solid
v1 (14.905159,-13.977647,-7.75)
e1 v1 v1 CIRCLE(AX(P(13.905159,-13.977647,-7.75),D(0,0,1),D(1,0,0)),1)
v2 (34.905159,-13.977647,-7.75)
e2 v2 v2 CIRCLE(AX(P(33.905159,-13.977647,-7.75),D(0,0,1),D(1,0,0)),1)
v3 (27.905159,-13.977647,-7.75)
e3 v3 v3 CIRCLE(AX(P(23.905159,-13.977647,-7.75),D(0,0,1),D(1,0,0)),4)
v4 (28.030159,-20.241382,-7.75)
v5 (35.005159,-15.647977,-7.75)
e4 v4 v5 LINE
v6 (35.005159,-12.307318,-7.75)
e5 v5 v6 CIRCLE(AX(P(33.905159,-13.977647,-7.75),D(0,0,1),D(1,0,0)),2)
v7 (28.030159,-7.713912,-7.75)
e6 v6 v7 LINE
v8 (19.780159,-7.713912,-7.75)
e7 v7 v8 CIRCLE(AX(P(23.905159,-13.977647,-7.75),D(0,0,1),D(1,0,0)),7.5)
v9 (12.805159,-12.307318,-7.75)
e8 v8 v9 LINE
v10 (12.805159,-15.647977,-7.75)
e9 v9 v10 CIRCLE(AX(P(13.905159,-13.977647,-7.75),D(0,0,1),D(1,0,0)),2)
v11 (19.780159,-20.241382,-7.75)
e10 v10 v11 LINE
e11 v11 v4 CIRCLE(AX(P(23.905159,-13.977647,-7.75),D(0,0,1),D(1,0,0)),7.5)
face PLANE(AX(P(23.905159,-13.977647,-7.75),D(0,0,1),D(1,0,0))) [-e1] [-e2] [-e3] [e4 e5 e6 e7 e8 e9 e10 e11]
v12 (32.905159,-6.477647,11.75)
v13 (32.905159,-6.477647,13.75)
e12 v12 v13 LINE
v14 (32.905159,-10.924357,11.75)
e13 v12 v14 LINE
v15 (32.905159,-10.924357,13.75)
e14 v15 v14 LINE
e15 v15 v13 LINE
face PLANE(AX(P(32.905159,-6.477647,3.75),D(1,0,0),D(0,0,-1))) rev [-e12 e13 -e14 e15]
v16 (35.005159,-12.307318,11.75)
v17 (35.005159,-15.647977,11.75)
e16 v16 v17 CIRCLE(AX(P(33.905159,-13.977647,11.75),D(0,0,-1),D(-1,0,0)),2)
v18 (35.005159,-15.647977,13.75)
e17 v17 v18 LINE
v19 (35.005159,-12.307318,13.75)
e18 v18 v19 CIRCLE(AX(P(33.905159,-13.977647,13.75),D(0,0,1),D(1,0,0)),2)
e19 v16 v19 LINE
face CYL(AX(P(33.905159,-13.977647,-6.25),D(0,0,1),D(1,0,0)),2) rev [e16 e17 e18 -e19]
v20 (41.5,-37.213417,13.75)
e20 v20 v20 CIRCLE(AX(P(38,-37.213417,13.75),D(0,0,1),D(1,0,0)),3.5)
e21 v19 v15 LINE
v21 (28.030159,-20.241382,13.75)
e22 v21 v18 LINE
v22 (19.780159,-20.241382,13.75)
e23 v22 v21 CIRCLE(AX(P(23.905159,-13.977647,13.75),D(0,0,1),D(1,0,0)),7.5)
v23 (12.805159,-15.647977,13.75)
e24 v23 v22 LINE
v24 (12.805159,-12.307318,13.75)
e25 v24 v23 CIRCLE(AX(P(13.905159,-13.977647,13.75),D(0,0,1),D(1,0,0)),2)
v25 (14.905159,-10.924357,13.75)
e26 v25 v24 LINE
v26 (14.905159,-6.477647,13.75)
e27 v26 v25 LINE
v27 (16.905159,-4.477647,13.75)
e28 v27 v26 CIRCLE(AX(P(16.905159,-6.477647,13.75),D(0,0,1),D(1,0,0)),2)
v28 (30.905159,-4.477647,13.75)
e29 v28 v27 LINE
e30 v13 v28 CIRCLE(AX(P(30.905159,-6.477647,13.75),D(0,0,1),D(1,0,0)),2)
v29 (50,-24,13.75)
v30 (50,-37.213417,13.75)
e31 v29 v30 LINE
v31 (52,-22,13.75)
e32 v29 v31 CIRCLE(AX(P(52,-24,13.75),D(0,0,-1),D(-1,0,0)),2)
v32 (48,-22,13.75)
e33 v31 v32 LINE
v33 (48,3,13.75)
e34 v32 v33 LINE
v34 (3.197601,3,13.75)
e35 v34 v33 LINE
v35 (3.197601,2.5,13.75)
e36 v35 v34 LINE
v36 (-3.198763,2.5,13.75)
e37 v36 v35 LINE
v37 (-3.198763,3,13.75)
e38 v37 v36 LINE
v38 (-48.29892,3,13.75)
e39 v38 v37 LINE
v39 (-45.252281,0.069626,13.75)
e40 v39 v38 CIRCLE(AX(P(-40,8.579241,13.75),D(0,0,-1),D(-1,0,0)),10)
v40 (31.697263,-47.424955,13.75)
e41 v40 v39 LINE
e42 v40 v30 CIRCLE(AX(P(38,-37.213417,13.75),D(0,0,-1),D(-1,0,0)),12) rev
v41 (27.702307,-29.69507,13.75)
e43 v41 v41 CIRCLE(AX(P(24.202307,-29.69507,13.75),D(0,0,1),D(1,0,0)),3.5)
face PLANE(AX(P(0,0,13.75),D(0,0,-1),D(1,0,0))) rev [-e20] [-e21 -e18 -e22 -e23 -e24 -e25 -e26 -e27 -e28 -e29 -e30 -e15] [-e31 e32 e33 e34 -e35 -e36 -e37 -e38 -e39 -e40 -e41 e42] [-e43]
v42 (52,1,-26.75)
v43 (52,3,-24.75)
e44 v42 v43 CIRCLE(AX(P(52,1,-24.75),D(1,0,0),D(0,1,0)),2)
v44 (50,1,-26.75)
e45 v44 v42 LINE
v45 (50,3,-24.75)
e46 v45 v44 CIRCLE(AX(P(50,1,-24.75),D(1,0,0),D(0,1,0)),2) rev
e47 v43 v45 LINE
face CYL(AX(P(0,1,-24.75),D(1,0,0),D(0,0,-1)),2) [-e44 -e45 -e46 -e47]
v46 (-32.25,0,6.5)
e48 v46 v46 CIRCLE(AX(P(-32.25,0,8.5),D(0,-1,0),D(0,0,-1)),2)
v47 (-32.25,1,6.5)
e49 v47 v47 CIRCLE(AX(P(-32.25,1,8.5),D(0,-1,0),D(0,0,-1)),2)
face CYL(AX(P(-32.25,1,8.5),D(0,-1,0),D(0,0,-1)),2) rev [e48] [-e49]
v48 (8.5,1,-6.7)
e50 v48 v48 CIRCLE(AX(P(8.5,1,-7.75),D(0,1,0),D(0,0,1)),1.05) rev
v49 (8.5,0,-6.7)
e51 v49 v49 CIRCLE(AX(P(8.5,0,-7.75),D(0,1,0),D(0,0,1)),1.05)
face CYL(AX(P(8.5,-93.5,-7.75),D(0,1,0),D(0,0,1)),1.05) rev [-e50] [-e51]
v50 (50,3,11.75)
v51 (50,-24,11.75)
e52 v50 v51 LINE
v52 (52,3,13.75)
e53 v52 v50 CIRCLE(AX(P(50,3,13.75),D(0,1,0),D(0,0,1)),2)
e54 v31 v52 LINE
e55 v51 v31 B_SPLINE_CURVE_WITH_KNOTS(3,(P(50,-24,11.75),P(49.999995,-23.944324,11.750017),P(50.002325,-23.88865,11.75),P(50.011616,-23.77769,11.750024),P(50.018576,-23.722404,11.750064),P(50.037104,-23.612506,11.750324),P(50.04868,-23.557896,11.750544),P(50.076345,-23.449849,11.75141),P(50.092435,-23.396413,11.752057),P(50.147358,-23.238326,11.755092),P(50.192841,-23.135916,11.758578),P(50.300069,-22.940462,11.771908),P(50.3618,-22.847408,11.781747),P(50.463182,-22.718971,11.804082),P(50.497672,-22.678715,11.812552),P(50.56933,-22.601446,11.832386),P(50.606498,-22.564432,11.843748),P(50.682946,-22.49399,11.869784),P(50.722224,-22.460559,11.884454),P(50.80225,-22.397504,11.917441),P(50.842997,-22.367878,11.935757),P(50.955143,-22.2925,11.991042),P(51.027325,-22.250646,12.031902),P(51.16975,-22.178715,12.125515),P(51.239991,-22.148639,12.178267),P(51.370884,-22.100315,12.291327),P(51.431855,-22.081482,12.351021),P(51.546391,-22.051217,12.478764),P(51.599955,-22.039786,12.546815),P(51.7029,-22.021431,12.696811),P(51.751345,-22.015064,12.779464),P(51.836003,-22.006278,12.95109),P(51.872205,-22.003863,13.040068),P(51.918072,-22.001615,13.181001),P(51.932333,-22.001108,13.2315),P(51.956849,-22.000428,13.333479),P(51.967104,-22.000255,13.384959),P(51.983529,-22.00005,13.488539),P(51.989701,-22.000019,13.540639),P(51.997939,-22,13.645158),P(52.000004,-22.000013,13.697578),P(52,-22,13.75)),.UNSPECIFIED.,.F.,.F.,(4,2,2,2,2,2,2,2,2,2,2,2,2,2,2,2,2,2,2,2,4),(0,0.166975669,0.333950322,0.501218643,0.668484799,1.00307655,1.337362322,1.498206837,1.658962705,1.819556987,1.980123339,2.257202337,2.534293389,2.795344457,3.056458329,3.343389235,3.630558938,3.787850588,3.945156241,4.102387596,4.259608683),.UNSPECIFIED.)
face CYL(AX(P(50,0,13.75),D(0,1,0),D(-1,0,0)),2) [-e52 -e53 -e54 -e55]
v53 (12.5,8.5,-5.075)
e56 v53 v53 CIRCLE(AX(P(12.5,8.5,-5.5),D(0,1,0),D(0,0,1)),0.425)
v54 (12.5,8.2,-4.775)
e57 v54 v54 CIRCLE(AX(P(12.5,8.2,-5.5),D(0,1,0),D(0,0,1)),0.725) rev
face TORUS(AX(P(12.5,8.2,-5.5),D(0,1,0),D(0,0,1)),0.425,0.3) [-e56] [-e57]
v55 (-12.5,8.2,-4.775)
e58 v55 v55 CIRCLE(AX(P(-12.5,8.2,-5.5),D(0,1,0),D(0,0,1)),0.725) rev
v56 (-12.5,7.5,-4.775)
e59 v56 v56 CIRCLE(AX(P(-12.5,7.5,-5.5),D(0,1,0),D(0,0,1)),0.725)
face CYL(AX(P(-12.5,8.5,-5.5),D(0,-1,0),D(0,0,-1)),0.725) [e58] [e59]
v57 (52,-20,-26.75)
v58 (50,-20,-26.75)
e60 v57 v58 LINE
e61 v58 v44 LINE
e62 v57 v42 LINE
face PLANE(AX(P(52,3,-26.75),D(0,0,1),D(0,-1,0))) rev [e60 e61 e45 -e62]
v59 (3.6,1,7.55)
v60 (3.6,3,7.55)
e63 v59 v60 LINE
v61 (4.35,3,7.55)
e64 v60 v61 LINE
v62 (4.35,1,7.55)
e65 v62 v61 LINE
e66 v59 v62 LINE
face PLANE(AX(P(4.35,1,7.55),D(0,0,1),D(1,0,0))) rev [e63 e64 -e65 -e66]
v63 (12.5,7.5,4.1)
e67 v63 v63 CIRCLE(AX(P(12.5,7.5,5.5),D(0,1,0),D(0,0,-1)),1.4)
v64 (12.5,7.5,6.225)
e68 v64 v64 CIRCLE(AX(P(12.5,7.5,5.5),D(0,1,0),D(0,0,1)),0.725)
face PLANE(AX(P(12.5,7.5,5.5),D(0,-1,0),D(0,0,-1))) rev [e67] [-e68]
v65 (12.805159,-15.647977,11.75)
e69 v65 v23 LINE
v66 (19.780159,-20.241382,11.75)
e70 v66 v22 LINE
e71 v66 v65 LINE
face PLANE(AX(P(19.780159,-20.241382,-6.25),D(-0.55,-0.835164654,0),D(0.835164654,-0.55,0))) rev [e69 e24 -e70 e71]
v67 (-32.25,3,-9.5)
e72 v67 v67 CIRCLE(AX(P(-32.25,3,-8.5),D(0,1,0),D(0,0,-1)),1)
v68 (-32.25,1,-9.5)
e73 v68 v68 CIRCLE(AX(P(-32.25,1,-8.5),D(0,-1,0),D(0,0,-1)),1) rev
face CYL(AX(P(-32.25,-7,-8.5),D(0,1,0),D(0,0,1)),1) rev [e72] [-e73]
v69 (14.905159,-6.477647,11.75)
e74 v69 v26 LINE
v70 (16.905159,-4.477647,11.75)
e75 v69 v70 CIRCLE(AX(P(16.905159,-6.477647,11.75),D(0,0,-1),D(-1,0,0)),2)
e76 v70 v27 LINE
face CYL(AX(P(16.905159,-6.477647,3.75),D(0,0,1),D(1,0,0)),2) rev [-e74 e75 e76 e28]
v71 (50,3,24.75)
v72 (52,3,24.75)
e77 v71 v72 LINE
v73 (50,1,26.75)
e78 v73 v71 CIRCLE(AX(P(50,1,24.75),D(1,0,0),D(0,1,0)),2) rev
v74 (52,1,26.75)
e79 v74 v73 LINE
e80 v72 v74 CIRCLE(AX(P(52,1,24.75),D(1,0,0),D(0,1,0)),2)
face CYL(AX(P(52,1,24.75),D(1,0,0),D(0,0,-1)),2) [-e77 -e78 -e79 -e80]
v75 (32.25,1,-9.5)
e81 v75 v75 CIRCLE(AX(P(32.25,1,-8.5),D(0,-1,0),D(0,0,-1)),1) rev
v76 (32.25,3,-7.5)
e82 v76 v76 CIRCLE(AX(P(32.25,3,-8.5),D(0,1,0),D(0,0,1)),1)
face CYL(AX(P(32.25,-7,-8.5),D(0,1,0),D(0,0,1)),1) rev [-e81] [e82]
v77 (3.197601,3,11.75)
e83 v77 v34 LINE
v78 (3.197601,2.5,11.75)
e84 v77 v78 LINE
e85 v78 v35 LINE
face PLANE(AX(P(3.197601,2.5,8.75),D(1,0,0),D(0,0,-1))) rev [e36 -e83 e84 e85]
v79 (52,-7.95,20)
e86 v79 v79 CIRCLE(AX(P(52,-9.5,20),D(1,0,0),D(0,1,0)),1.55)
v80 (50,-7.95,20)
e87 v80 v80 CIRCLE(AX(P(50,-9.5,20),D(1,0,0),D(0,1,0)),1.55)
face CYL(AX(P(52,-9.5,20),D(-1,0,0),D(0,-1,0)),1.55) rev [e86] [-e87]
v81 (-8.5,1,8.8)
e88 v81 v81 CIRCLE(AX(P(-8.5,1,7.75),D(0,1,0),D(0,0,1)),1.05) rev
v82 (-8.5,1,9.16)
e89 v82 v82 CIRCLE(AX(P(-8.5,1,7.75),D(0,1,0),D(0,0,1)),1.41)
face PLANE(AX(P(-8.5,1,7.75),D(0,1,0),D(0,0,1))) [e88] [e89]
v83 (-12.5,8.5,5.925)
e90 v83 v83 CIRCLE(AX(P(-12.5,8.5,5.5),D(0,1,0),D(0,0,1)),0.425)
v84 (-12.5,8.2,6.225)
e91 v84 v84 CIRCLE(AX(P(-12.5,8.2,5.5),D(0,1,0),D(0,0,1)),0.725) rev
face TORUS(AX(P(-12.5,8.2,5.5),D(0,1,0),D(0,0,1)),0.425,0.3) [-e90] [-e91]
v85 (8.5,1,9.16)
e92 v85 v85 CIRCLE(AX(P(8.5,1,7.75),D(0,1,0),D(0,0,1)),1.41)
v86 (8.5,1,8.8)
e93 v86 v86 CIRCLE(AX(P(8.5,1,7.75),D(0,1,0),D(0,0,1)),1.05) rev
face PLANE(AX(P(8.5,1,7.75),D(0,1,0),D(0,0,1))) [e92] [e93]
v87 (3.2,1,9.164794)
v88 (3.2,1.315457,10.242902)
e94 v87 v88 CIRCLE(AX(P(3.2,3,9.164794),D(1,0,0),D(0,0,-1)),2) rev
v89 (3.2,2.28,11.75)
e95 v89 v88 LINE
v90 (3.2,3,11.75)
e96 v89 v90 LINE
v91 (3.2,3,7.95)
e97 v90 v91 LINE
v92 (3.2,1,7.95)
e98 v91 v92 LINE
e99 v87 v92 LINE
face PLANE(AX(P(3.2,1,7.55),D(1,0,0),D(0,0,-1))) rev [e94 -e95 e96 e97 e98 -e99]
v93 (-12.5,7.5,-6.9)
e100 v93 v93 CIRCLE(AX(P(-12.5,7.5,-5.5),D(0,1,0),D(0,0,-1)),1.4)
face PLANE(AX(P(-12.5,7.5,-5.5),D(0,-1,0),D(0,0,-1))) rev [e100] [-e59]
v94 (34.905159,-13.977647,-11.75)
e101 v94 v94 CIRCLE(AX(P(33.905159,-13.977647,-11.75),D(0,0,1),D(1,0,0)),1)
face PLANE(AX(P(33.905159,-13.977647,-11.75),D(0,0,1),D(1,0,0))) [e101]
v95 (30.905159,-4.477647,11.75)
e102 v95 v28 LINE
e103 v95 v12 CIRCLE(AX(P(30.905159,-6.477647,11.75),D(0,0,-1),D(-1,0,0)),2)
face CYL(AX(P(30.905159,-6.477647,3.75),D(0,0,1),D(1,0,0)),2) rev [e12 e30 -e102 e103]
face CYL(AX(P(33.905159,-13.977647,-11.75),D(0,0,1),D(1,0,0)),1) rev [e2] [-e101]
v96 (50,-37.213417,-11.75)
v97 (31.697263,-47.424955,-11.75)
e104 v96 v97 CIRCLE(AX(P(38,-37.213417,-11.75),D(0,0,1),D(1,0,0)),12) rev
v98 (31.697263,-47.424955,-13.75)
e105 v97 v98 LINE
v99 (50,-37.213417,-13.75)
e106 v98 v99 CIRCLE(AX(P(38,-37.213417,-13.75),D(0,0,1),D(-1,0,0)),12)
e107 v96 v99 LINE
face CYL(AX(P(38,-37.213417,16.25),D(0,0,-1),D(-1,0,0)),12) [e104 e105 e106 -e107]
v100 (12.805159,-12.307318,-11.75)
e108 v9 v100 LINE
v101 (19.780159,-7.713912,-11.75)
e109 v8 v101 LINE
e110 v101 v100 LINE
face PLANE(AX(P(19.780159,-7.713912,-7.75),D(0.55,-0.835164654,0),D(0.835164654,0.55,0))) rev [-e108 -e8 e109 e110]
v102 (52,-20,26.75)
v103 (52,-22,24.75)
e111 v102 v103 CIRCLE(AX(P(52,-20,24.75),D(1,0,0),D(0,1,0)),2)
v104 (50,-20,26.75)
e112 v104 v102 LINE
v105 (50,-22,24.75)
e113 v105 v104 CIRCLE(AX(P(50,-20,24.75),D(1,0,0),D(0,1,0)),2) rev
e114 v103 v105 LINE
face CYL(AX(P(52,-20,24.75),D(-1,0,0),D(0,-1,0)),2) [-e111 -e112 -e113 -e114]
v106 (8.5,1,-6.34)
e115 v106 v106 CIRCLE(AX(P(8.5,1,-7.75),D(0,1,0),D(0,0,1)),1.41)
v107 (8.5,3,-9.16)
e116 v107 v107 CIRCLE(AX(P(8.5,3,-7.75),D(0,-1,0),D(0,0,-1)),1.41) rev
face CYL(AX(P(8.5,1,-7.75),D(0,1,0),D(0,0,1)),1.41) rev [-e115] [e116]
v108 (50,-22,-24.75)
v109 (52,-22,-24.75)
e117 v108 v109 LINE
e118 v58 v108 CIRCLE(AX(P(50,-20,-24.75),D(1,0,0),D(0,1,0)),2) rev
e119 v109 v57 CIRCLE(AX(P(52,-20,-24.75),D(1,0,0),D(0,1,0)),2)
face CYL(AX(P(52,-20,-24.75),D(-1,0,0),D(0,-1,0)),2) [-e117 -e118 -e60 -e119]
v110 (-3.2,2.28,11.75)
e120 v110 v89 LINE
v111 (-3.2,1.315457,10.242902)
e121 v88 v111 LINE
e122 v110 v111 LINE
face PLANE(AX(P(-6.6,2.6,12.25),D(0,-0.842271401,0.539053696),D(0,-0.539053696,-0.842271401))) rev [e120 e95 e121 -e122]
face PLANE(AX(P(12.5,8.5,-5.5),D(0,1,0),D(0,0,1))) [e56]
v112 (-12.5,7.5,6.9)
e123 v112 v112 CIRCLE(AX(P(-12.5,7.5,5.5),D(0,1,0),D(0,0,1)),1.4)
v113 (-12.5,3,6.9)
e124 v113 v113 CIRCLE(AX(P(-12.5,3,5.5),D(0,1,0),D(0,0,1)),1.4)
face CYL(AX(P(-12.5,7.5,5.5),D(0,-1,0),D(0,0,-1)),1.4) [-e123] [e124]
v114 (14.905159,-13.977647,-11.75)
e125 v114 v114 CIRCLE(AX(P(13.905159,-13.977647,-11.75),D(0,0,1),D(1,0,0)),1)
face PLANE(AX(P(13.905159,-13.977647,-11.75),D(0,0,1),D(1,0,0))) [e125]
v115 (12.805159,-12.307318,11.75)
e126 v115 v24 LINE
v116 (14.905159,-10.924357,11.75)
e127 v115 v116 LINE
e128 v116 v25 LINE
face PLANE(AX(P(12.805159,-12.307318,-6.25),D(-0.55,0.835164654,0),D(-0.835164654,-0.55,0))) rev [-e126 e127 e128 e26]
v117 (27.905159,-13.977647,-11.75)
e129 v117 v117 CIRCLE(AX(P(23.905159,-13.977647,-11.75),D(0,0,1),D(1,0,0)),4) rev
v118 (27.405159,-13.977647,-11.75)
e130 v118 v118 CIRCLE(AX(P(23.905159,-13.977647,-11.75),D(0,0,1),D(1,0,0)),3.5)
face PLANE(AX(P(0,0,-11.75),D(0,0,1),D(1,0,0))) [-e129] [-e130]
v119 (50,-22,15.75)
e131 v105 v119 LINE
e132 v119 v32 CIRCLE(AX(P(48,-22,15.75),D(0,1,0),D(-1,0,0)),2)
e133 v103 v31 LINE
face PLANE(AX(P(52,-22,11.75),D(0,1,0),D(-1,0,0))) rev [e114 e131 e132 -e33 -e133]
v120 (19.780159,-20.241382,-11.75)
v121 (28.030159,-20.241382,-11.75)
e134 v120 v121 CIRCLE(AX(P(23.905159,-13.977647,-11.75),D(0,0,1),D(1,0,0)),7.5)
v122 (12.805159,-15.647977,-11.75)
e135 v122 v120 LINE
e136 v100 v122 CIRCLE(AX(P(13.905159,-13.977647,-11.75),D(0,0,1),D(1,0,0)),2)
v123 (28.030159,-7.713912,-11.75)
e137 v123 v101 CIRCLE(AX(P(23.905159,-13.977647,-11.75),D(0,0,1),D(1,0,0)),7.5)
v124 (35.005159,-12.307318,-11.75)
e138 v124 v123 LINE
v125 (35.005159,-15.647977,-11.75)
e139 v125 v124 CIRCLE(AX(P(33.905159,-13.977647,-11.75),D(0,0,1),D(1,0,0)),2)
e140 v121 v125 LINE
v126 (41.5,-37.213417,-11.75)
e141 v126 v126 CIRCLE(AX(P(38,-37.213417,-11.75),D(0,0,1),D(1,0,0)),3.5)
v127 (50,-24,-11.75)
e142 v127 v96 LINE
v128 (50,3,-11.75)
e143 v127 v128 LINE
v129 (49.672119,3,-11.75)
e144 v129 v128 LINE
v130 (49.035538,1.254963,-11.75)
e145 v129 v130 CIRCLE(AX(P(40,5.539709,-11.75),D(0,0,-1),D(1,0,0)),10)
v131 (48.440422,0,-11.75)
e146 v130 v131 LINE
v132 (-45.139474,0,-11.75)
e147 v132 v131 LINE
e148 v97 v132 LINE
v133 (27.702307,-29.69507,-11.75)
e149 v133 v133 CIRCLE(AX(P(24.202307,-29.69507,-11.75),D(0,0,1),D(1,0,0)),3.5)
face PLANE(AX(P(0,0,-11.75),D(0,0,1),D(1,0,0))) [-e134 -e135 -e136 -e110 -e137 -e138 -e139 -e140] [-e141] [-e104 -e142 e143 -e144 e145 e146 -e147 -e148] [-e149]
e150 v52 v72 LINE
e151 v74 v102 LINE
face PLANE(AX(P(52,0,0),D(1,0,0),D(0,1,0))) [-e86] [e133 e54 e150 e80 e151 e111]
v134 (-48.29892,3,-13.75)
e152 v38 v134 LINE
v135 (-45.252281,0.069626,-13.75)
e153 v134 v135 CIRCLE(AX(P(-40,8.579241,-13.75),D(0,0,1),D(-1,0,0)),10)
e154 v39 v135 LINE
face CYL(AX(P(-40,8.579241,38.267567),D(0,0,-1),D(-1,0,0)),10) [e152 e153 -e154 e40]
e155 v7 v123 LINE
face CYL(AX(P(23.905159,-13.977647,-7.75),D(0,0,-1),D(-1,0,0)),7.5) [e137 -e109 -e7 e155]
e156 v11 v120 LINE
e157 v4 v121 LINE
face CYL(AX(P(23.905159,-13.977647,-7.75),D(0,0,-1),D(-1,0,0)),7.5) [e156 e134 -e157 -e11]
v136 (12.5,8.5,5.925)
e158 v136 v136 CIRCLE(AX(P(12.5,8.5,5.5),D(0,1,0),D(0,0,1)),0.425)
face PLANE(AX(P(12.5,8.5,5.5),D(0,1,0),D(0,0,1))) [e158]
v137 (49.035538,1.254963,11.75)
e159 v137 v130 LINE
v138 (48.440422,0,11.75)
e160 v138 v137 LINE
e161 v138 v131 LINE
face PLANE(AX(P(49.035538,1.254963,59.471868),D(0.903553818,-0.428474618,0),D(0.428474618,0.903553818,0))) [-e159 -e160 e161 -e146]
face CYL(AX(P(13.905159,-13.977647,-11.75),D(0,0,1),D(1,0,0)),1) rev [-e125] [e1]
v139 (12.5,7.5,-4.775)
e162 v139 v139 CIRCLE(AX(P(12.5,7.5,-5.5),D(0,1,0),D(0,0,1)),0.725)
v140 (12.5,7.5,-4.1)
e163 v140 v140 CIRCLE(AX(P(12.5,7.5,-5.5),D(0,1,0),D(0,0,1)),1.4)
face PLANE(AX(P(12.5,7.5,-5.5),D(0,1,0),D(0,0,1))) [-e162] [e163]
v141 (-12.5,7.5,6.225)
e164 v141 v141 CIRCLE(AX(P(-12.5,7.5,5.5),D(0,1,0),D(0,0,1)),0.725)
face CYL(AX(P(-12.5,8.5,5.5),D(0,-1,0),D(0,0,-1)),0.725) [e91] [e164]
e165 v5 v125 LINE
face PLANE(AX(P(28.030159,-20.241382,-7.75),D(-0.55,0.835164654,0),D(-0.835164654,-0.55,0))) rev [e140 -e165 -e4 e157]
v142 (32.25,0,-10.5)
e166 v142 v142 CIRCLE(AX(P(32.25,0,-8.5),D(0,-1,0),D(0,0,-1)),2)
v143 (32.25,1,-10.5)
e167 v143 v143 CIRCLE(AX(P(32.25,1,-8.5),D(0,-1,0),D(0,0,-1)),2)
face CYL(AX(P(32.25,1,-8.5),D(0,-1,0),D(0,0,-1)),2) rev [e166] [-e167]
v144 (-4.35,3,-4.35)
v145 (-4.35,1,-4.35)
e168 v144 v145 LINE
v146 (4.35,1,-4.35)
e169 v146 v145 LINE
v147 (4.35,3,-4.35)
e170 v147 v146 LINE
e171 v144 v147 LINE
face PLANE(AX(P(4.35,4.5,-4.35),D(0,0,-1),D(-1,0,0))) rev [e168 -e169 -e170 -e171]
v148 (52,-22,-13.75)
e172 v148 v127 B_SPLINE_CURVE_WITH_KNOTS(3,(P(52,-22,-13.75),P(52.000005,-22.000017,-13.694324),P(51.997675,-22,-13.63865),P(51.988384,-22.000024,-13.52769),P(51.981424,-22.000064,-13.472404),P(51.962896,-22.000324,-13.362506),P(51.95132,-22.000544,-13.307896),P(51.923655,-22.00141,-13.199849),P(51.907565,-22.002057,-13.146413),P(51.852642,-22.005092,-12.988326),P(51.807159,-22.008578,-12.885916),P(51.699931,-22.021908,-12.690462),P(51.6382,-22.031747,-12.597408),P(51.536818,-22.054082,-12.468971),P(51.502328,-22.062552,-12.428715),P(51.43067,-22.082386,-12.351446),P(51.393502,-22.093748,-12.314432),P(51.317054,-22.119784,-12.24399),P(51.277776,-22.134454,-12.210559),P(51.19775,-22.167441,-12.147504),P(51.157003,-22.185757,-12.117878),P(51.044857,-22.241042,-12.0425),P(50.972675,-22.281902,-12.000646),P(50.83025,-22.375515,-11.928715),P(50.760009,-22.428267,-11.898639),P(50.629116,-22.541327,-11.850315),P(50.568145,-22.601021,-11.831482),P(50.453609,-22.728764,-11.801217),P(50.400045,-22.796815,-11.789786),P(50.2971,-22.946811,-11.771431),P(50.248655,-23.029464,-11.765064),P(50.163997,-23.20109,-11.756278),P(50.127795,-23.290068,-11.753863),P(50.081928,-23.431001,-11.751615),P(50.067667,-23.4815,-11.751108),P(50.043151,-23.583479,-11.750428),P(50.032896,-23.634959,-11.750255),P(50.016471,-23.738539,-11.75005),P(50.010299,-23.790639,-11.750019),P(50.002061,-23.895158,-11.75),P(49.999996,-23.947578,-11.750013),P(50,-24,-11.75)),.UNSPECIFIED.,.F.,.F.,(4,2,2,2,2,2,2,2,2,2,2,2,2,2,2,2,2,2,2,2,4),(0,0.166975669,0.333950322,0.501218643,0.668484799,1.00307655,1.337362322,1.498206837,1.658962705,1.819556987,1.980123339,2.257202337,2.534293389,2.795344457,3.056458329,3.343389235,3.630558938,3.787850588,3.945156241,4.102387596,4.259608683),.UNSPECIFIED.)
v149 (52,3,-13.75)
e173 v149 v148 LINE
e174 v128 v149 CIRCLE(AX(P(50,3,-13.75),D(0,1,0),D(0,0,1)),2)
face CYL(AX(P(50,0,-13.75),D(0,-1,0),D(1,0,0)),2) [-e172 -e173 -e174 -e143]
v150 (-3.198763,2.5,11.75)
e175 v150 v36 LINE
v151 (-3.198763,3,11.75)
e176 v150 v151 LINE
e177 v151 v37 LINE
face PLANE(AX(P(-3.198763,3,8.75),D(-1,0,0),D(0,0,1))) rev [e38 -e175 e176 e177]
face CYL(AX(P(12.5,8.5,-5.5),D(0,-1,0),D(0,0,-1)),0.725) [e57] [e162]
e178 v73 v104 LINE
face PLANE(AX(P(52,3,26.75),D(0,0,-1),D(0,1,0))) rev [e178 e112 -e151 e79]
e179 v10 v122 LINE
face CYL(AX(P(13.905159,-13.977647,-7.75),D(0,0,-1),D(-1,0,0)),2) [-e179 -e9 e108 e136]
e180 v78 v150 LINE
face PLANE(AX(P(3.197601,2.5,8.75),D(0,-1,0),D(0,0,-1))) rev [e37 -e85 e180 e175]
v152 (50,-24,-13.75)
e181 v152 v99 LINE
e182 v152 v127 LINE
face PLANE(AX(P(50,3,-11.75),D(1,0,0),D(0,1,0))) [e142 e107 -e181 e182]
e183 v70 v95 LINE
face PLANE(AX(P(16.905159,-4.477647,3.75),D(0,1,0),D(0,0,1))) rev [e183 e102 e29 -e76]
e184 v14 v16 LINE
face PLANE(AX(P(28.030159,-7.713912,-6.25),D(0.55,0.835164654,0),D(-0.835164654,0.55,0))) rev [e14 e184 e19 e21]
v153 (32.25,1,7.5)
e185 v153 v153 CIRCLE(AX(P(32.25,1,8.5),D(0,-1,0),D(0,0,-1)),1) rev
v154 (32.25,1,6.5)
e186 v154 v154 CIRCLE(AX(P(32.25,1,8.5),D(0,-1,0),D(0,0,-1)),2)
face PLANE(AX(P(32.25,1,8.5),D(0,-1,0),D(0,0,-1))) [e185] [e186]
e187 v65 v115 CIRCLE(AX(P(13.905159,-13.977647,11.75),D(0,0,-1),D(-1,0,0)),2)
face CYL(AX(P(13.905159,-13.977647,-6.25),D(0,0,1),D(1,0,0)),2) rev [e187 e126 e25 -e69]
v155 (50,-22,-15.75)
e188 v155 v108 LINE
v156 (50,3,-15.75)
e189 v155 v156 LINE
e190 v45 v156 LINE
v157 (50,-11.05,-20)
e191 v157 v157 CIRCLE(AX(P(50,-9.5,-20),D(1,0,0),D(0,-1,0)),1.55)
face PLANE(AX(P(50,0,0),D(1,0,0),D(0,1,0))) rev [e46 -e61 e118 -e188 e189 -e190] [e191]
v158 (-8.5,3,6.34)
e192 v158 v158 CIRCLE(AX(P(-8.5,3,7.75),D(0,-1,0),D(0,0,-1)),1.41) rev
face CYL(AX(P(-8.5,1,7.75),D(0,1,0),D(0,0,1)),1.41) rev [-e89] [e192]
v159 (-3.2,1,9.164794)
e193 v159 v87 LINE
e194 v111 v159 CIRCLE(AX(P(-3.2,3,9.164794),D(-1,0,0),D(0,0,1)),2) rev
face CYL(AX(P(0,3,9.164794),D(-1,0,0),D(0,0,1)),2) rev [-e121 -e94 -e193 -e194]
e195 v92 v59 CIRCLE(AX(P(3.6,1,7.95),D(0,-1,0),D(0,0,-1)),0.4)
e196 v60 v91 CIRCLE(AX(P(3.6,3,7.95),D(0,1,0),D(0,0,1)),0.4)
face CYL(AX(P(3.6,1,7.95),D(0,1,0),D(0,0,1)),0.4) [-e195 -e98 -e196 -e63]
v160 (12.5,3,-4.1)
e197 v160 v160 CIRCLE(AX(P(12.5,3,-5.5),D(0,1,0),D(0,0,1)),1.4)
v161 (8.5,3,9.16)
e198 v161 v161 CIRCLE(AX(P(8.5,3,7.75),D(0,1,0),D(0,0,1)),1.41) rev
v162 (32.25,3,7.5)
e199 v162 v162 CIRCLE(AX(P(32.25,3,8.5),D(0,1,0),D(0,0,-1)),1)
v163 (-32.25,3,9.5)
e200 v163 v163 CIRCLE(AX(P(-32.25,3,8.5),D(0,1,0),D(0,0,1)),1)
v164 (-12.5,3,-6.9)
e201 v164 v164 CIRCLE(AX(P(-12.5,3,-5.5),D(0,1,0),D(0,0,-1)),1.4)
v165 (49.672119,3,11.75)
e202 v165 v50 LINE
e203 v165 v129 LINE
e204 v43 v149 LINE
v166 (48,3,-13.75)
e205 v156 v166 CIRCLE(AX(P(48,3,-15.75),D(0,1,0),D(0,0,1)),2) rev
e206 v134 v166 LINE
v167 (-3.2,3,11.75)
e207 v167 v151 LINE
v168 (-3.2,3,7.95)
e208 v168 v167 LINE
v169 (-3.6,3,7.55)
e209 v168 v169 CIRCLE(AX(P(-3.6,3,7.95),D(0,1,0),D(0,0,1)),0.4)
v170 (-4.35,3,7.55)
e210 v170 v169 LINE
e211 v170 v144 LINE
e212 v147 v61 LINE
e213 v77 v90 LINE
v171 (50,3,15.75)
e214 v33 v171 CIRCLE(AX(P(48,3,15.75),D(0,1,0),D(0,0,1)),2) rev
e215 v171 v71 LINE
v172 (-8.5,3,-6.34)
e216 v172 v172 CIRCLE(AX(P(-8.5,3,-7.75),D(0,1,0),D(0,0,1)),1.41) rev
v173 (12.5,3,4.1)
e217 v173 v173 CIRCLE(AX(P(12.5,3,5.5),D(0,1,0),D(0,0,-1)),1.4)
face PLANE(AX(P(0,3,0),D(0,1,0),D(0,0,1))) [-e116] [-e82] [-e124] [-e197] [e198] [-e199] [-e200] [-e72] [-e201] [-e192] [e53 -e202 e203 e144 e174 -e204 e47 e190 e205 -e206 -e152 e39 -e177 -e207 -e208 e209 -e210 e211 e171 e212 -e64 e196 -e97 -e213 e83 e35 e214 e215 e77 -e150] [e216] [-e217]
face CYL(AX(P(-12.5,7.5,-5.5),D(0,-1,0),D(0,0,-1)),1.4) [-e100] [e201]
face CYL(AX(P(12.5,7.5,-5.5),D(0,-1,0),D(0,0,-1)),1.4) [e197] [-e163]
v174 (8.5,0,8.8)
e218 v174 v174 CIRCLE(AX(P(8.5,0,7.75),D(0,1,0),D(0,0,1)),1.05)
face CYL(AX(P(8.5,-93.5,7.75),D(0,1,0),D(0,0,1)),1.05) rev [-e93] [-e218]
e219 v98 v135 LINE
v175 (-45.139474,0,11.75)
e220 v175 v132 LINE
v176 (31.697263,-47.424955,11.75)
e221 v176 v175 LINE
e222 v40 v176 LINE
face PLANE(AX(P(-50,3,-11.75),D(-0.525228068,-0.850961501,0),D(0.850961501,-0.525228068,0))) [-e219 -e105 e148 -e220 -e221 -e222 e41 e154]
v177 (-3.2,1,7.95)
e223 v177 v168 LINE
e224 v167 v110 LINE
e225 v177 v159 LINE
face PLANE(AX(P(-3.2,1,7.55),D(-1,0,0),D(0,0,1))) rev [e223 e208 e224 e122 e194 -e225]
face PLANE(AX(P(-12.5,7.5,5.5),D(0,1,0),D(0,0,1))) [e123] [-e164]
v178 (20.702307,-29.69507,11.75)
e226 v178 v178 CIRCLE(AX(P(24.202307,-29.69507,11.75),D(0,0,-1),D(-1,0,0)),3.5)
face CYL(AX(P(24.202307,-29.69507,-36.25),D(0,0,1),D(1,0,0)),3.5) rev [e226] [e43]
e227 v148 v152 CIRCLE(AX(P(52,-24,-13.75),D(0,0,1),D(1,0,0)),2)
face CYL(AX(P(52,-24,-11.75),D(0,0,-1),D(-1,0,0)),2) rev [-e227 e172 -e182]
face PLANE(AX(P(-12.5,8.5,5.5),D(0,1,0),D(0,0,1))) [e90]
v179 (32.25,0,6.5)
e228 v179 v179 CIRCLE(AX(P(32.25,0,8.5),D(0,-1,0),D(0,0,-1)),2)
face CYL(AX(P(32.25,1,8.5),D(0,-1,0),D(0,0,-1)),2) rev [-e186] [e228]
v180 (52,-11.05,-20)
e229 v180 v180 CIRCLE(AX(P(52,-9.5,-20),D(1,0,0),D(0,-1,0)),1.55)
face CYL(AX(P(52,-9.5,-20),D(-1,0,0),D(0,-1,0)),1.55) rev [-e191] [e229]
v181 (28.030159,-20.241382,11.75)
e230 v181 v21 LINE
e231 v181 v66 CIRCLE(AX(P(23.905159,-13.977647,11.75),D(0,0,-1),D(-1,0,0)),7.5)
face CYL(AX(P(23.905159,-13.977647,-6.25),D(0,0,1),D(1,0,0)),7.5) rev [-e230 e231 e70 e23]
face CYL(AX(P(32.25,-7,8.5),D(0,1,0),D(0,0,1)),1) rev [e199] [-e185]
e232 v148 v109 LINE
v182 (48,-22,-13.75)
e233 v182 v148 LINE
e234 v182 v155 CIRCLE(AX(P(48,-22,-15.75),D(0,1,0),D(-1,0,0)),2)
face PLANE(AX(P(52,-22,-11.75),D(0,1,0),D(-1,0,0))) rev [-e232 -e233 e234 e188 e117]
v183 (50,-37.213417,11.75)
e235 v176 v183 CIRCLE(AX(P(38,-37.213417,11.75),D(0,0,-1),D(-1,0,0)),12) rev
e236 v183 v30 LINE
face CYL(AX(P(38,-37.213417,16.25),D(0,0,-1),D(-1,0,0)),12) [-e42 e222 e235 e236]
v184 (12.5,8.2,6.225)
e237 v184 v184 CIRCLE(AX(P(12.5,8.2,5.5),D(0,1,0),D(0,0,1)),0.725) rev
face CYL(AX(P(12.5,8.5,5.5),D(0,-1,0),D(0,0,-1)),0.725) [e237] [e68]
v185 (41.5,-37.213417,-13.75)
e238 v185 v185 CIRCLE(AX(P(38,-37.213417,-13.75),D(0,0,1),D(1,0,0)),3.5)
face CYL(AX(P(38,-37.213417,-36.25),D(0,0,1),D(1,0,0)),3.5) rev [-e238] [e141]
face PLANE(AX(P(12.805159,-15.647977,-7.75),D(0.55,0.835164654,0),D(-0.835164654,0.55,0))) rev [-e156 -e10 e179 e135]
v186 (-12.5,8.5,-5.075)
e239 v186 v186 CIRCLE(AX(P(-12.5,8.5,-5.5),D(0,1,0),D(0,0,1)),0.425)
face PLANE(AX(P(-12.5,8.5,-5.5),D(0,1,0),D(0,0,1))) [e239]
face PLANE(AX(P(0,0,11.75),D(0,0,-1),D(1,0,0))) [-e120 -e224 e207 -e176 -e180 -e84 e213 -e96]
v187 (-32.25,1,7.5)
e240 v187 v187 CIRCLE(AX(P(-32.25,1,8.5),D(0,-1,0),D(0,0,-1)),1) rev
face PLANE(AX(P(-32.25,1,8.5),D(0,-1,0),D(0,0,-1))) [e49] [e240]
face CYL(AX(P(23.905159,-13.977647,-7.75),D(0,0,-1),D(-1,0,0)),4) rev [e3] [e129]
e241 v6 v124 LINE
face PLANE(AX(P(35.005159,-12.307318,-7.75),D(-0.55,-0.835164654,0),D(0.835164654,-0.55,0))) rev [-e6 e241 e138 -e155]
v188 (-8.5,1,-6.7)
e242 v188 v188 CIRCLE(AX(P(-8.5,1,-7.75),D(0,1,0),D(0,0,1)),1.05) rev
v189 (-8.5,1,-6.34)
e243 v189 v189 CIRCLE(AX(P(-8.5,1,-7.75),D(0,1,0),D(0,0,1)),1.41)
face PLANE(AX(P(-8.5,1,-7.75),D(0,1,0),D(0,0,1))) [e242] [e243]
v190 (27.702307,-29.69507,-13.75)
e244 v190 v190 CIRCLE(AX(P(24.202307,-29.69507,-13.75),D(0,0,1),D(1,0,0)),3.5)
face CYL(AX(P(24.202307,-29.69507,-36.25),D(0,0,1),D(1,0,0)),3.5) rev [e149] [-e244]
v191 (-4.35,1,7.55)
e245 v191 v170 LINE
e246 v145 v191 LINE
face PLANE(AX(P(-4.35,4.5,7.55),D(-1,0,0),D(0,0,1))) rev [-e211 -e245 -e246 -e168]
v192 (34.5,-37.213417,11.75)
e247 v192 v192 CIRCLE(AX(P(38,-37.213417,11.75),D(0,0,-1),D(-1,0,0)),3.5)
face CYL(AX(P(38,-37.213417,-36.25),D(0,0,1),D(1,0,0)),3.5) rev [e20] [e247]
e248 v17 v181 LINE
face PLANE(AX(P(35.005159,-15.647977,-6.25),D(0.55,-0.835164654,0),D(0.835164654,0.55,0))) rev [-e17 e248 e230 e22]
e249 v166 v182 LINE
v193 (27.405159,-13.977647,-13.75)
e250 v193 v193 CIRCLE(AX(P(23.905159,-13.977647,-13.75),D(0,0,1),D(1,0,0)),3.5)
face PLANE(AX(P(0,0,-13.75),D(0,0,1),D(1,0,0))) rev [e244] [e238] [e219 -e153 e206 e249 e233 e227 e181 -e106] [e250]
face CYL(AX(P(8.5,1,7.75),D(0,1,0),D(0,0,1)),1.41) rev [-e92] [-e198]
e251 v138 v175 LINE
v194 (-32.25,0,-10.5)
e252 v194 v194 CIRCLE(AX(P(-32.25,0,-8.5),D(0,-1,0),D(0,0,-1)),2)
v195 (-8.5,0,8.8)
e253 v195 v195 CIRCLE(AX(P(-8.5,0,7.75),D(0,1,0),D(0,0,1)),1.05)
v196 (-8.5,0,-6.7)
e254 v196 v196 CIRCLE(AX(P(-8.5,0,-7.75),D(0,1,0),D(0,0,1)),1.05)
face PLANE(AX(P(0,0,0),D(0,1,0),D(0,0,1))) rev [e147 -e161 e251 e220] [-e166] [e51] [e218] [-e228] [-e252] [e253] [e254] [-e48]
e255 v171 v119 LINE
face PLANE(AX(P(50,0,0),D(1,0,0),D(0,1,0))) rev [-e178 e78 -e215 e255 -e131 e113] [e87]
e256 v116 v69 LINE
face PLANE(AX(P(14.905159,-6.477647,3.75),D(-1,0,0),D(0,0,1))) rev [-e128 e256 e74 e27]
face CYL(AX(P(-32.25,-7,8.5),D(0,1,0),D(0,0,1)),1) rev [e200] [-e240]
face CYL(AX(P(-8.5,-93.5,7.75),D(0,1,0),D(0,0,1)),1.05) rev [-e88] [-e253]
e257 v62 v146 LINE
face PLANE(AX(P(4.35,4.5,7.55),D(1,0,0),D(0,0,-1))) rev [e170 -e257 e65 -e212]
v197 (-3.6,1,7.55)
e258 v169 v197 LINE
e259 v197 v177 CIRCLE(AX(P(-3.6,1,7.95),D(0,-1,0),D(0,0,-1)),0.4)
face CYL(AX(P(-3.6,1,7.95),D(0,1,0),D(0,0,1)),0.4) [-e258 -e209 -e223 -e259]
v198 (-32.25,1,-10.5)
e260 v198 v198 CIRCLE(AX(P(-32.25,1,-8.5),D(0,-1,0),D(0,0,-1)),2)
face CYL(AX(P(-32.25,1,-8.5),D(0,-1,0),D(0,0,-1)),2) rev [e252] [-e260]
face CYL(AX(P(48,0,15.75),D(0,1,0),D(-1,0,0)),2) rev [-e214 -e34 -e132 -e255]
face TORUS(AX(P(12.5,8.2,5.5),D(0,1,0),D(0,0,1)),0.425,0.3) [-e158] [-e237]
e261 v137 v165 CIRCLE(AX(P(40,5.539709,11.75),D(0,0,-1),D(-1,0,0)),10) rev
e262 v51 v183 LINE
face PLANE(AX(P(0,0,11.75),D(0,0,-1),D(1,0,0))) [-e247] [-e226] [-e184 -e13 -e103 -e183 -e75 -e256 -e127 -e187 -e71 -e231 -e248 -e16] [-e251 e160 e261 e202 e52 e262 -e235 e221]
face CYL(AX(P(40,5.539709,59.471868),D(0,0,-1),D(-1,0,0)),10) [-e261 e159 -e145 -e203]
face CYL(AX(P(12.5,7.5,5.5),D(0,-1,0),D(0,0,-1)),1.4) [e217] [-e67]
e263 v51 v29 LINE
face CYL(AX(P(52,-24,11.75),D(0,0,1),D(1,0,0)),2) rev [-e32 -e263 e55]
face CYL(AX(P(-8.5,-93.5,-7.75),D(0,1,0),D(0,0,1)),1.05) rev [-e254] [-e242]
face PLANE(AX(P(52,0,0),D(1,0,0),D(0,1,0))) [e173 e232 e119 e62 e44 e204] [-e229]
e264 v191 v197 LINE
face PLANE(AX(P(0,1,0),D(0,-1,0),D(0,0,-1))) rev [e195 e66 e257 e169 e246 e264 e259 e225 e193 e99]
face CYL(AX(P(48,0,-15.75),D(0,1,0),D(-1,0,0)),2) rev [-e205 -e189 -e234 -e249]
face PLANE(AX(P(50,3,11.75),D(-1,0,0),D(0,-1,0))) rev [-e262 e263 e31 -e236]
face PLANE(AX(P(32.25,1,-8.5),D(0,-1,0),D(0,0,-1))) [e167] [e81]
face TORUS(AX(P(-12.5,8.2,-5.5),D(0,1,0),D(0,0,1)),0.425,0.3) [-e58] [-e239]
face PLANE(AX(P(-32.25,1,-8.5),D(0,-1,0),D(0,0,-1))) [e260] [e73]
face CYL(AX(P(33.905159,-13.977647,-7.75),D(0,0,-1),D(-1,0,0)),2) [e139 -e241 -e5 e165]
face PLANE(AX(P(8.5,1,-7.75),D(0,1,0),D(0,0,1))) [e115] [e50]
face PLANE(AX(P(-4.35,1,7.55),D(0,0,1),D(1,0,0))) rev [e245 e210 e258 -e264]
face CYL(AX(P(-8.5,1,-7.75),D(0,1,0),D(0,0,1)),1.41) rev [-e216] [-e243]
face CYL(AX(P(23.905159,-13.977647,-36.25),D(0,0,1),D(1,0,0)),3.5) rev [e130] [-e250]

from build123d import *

# Parameters (mm, degrees)
SKETCH_1_W           = 100
SKETCH_1_H           = 25.5
EXTRUDE_1_DEPTH      = 3
EXTRUDE_2_DEPTH      = 1.5
SKETCH_5_R           = 1.4
EXTRUDE_3_DEPTH      = 4.5
SKETCH_6_R           = 0.725
EXTRUDE_4_DEPTH      = 1
SKETCH_7_R           = 1
CUT_EXTRUDE_1_DEPTH  = 10
SKETCH_8_R           = 2
CUT_EXTRUDE_2_DEPTH  = 1
FILLET_1_R           = 2
SKETCH_9_R           = 2.65
EXTRUDE_5_DEPTH      = 3.5
SKETCH_11_R          = 1.05
CUT_EXTRUDE_4_DEPTH  = 100
SKETCH_12_R          = 1.41
CUT_EXTRUDE_5_DEPTH  = 5.5
FILLET_2_R           = 0.3
CUT_EXTRUDE_8_DEPTH  = 2
CUT_EXTRUDE_9_DEPTH  = 1.5
EXTRUDE_6_DEPTH      = 6.4
FILLET_3_R           = 2
FILLET_5_R           = 1
FILLET_6_R           = 0.4
SKETCH_23_R          = 2.838964553
CUT_EXTRUDE_11_DEPTH = 5
EXTRUDE_12_DEPTH     = 1
CUT_EXTRUDE_20_DEPTH = 27.5
CUT_EXTRUDE_21_DEPTH = 23.5
CUT_EXTRUDE_22_DEPTH = 30
SKETCH_38_R          = 3.5
CUT_EXTRUDE_23_DEPTH = 50
SKETCH_40_R          = 3.5
CUT_EXTRUDE_24_DEPTH = 50
SKETCH_41_R          = 3.5
CUT_EXTRUDE_25_DEPTH = 50
CUT_EXTRUDE_26_DEPTH = 20
EXTRUDE_START        = 4
SKETCH_45_R          = 4
EXTRUDE_13_DEPTH     = 4
SKETCH_47_R          = 1
CUT_EXTRUDE_29_DEPTH = 4
SKETCH_48_W          = 6.396363923
SKETCH_48_H          = 0.5
CUT_EXTRUDE_30_DEPTH = 5
CUT_EXTRUDE_31_DEPTH = 10
SKETCH_50_W          = 15
SKETCH_50_H          = 25
SKETCH_50_R          = 1.55
EXTRUDE_14_DEPTH     = 2
FILLET_8_R           = 2
FILLET_9_R           = 2
FILLET_10_R          = 2


with BuildPart() as part:
    # 草图1 → 凸台-拉伸1 (new body)
    with BuildSketch(Plane(origin=(0, 0, 0), x_dir=(1, 0, 0), z_dir=(0, 1, 0))):
        Rectangle(SKETCH_1_W, SKETCH_1_H)
    extrude(amount=EXTRUDE_1_DEPTH)

    # 草图2 → 凸台-拉伸2 (add)
    with BuildSketch(Plane(origin=(0, 3, 0), x_dir=(1, 0, 0), z_dir=(0, 1, 0))):
        Polygon((-5.35, 5.35), (5.35, 5.35), (5.35, -7.55), (4.35, -7.55), (4.35, 4.35), (-4.35, 4.35), (-4.35, -7.55), (-5.35, -7.55), align=None)
    extrude(amount=EXTRUDE_2_DEPTH)

    # 草图5 → 凸台-拉伸3 (add)
    with BuildSketch(Plane(origin=(0, 3, 0), x_dir=(1, 0, 0), z_dir=(0, 1, 0))):
        with Locations(Location((12.5, 5.5, 0), (0, 0, 270))):
            Circle(SKETCH_5_R)
        with Locations(Location((12.5, -5.5, 0), (0, 0, 90))):
            Circle(SKETCH_5_R)
        with Locations(Location((-12.5, -5.5, 0), (0, 0, 270))):
            Circle(SKETCH_5_R)
        with Locations(Location((-12.5, 5.5, 0), (0, 0, 90))):
            Circle(SKETCH_5_R)
    extrude(amount=EXTRUDE_3_DEPTH)

    # 草图6 → 凸台-拉伸4 (add)
    with BuildSketch(Plane(origin=(0, 7.5, 0), x_dir=(1, 0, 0), z_dir=(0, 1, 0))):
        with Locations(Location((-12.5, -5.5, 0), (0, 0, 270))):
            Circle(SKETCH_6_R)
        with Locations(Location((-12.5, 5.5, 0), (0, 0, 270))):
            Circle(SKETCH_6_R)
        with Locations(Location((12.5, 5.5, 0), (0, 0, 270))):
            Circle(SKETCH_6_R)
        with Locations(Location((12.5, -5.5, 0), (0, 0, 270))):
            Circle(SKETCH_6_R)
    extrude(amount=EXTRUDE_4_DEPTH)

    # 草图7 → 切除-拉伸1 (cut)
    with BuildSketch(Plane(origin=(0, 3, 0), x_dir=(1, 0, 0), z_dir=(0, 1, 0))):
        with Locations(Location((32.25, 8.5, 0), (0, 0, 270))):
            Circle(SKETCH_7_R)
        with Locations(Location((-32.25, 8.5, 0), (0, 0, 270))):
            Circle(SKETCH_7_R)
        with Locations(Location((-32.25, -8.5, 0), (0, 0, 270))):
            Circle(SKETCH_7_R)
        with Locations(Location((32.25, -8.5, 0), (0, 0, 270))):
            Circle(SKETCH_7_R)
    extrude(amount=-CUT_EXTRUDE_1_DEPTH, mode=Mode.SUBTRACT)

    # 草图8 → 切除-拉伸2 (cut)
    with BuildSketch(Plane.XZ):
        with Locations(Location((-32.25, 8.5, 0), (0, 0, 270))):
            Circle(SKETCH_8_R)
        with Locations(Location((32.25, 8.5, 0), (0, 0, 270))):
            Circle(SKETCH_8_R)
        with Locations(Location((32.25, -8.5, 0), (0, 0, 270))):
            Circle(SKETCH_8_R)
        with Locations(Location((-32.25, -8.5, 0), (0, 0, 270))):
            Circle(SKETCH_8_R)
    extrude(amount=-CUT_EXTRUDE_2_DEPTH, mode=Mode.SUBTRACT)

    # 圆角1
    fillet_1_edges = [part.edges().sort_by_distance(p)[0] for p in [
        (50, 1.5, 12.75),
        (-50, 1.5, 12.75),
        (-50, 1.5, -12.75),
        (50, 1.5, -12.75),
    ]]
    fillet(fillet_1_edges, radius=FILLET_1_R)

    # 草图9 → 凸台-拉伸5 (add)
    with BuildSketch(Plane(origin=(0, 3, 0), x_dir=(1, 0, 0), z_dir=(0, 1, 0))):
        with Locations(Location((8.5, 7.75, 0), (0, 0, 270))):
            Circle(SKETCH_9_R)
        with Locations(Location((-8.5, 7.75, 0), (0, 0, 90))):
            Circle(SKETCH_9_R)
        with Locations(Location((-8.5, -7.75, 0), (0, 0, 270))):
            Circle(SKETCH_9_R)
        with Locations(Location((8.5, -7.75, 0), (0, 0, 90))):
            Circle(SKETCH_9_R)
    extrude(amount=EXTRUDE_5_DEPTH)

    # 草图11 → 切除-拉伸4 (cut)
    with BuildSketch(Plane(origin=(0, 6.5, 0), x_dir=(1, 0, 0), z_dir=(0, 1, 0))):
        with Locations(Location((-8.5, 7.75, 0), (0, 0, 270))):
            Circle(SKETCH_11_R)
        with Locations(Location((-8.5, -7.75, 0), (0, 0, 270))):
            Circle(SKETCH_11_R)
        with Locations(Location((8.5, -7.75, 0), (0, 0, 270))):
            Circle(SKETCH_11_R)
        with Locations(Location((8.5, 7.75, 0), (0, 0, 270))):
            Circle(SKETCH_11_R)
    extrude(amount=-CUT_EXTRUDE_4_DEPTH, mode=Mode.SUBTRACT)

    # 草图12 → 切除-拉伸5 (cut)
    with BuildSketch(Plane(origin=(0, 6.5, 0), x_dir=(1, 0, 0), z_dir=(0, 1, 0))):
        with Locations(Location((-8.5, 7.75, 0), (0, 0, 270))):
            Circle(SKETCH_12_R)
        with Locations(Location((8.5, 7.75, 0), (0, 0, 270))):
            Circle(SKETCH_12_R)
        with Locations(Location((-8.5, -7.75, 0), (0, 0, 270))):
            Circle(SKETCH_12_R)
        with Locations(Location((8.5, -7.75, 0), (0, 0, 270))):
            Circle(SKETCH_12_R)
    extrude(amount=-CUT_EXTRUDE_5_DEPTH, mode=Mode.SUBTRACT)

    # 圆角2
    fillet_2_edges = [part.edges().sort_by_distance(p)[0] for p in [
        (-12.5, 8.5, 4.775),
        (-12.5, 8.5, -6.225),
        (12.5, 8.5, -6.225),
        (12.5, 8.5, 4.775),
    ]]
    fillet(fillet_2_edges, radius=FILLET_2_R)

    # 草图15 → 切除-拉伸8 (cut)
    with BuildSketch(Plane(origin=(0, 3, 0), x_dir=(1, 0, 0), z_dir=(0, 1, 0))):
        Polygon((-4.35, 4.35), (4.35, 4.35), (4.35, -7.55), (3.2, -7.55), (3.2, -12.75), (-3.2, -12.75), (-3.2, -7.55), (-4.35, -7.55), align=None)
    extrude(amount=-CUT_EXTRUDE_8_DEPTH, mode=Mode.SUBTRACT)

    # 草图17 → 切除-拉伸9 (cut)
    with BuildSketch(Plane(origin=(0, 4.5, 0), x_dir=(1, 0, 0), z_dir=(0, 1, 0))):
        Polygon((-4.35, -7.55), (-4.35, 4.35), (4.35, 4.35), (4.35, -7.55), (5.35, -7.55), (5.35, 5.35), (-5.35, 5.35), (-5.35, -7.55), align=None)
    extrude(amount=-CUT_EXTRUDE_9_DEPTH, mode=Mode.SUBTRACT)

    # 草图18 → 凸台-拉伸6 (add)
    with BuildSketch(Plane.ZY.offset(-3.2)):
        Polygon((12.75, 1), (9.75, 1), (12.25, 2.6), (12.75, 2.6), align=None)
    extrude(amount=EXTRUDE_6_DEPTH)

    # 圆角3
    fillet_3_edges = [part.edges().sort_by_distance(p)[0] for p in [
        (0, 1, 9.75),
    ]]
    fillet(fillet_3_edges, radius=FILLET_3_R)

    # 圆角5
    fillet_5_edges = [part.edges().sort_by_distance(p)[0] for p in [
        (0, 2.6, 12.25),
    ]]
    fillet(fillet_5_edges, radius=FILLET_5_R)

    # 圆角6
    fillet_6_edges = [part.edges().sort_by_distance(p)[0] for p in [
        (3.2, 2, 7.55),
        (-3.2, 2, 7.55),
    ]]
    fillet(fillet_6_edges, radius=FILLET_6_R)

    # 草图23 → 切除-拉伸11 (cut)
    with BuildSketch(Plane(origin=(0, 3, 0), x_dir=(1, 0, 0), z_dir=(0, 1, 0))):
        with Locations((-8.5, 7.75)):
            Circle(SKETCH_23_R)
        with Locations((8.5, 7.75)):
            Circle(SKETCH_23_R)
        with Locations((8.5, -7.75)):
            Circle(SKETCH_23_R)
        with Locations((-8.5, -7.75)):
            Circle(SKETCH_23_R)
    extrude(amount=CUT_EXTRUDE_11_DEPTH, mode=Mode.SUBTRACT)

    # 草图26 → 凸台-拉伸12 (add, symmetric)
    with BuildSketch(Plane(origin=(0, 0, -12.75), x_dir=(-1, 0, 0), z_dir=(0, 0, -1))):
        Polygon((50, 3), (-47.226468446, -57.009847793), (-50, -58.721719149), (-50, 3), align=None)
    extrude_12 = extrude(amount=EXTRUDE_12_DEPTH, both=True)

    # 镜向1: 凸台-拉伸12 across plane
    add(extrude_12.mirror(Plane.XY))

    # 草图34 → 切除-拉伸20 (cut)
    with BuildSketch(Plane(origin=(0, 0, -13.75), x_dir=(-1, 0, 0), z_dir=(0, 0, -1))):
        with BuildLine():
            Line((50, 15.008699923), (50, 8.579241028))
            ThreePointArc((50, 8.579241028), (48.73277753, 3.707013959), (45.252280679, 0.069626015))
            Line((45.252280679, 0.069626015), (38.344857738, -4.193754173))
            Line((38.344857738, -4.193754173), (52.839499898, -4.765435378))
            Line((52.839499898, -4.765435378), (50, 15.008699923))
        make_face()
    extrude(amount=-CUT_EXTRUDE_20_DEPTH, mode=Mode.SUBTRACT)

    # 草图35 → 切除-拉伸21 (cut)
    with BuildSketch(Plane.XY.offset(-11.75)):
        with BuildLine():
            Line((50, 10.630966152), (50, 5.53970897))
            ThreePointArc((50, 5.53970897), (49.755905436, 3.343733306), (49.035538177, 1.254962787))
            Line((49.035538177, 1.254962787), (33.740658756, -30.998398561))
            Line((33.740658756, -30.998398561), (57.072453739, -23.756268409))
            Line((57.072453739, -23.756268409), (50, 10.630966152))
        make_face()
    extrude(amount=CUT_EXTRUDE_21_DEPTH, mode=Mode.SUBTRACT)

    # 草图37 → 切除-拉伸22 (cut)
    with BuildSketch(Plane(origin=(0, 0, -13.75), x_dir=(-1, 0, 0), z_dir=(0, 0, -1))):
        with BuildLine():
            Line((-50, -58.721719149), (-31.697263185, -47.424955336))
            ThreePointArc((-31.697263185, -47.424955336), (-43.846672482, -47.692750357), (-50, -37.21341732))
            Line((-50, -37.21341732), (-50, -58.721719149))
        make_face()
    extrude(amount=-CUT_EXTRUDE_22_DEPTH, mode=Mode.SUBTRACT)

    # 草图38 → 切除-拉伸23 (cut)
    with BuildSketch(Plane.XY.offset(13.75)):
        with Locations((38, -37.21341732)):
            Circle(SKETCH_38_R)
    extrude(amount=-CUT_EXTRUDE_23_DEPTH, mode=Mode.SUBTRACT)

    # 草图40 → 切除-拉伸24 (cut)
    with BuildSketch(Plane.XY.offset(13.75)):
        with Locations((24.202306716, -29.69507016)):
            Circle(SKETCH_40_R)
    extrude(amount=-CUT_EXTRUDE_24_DEPTH, mode=Mode.SUBTRACT)

    # 草图41 → 切除-拉伸25 (cut)
    with BuildSketch(Plane.XY.offset(13.75)):
        with Locations((23.905158818, -13.977647254)):
            Circle(SKETCH_41_R)
    extrude(amount=-CUT_EXTRUDE_25_DEPTH, mode=Mode.SUBTRACT)

    # 草图43 → 切除-拉伸26 (cut)
    with BuildSketch(Plane.XY.offset(13.75)):
        with BuildLine():
            Line((28.030158818, -7.713912346), (35.005158818, -12.307317945))
            ThreePointArc((35.005158818, -12.307317945), (35.905158818, -13.977647254), (35.005158818, -15.647976563))
            Line((35.005158818, -15.647976563), (28.030158818, -20.241382162))
            ThreePointArc((28.030158818, -20.241382162), (23.905158818, -21.477647254), (19.780158818, -20.241382162))
            Line((19.780158818, -20.241382162), (12.805158818, -15.647976563))
            ThreePointArc((12.805158818, -15.647976563), (11.905158818, -13.977647254), (12.805158818, -12.307317945))
            Line((12.805158818, -12.307317945), (19.780158818, -7.713912346))
            ThreePointArc((19.780158818, -7.713912346), (23.905158818, -6.477647254), (28.030158818, -7.713912346))
        make_face()
    extrude(amount=-CUT_EXTRUDE_26_DEPTH, mode=Mode.SUBTRACT)

    # 草图45 → 凸台-拉伸13 (add)
    with BuildSketch(Plane.XY.offset(-11.75).offset(EXTRUDE_START)):
        with BuildLine():
            Line((19.780158818, -7.713912346), (12.805158818, -12.307317945))
            ThreePointArc((12.805158818, -12.307317945), (11.905158818, -13.977647254), (12.805158818, -15.647976563))
            Line((12.805158818, -15.647976563), (19.780158818, -20.241382162))
            ThreePointArc((19.780158818, -20.241382162), (23.905158818, -21.477647254), (28.030158818, -20.241382162))
            Line((28.030158818, -20.241382162), (35.005158818, -15.647976563))
            ThreePointArc((35.005158818, -15.647976563), (35.905158818, -13.977647254), (35.005158818, -12.307317945))
            Line((35.005158818, -12.307317945), (28.030158818, -7.713912346))
            ThreePointArc((28.030158818, -7.713912346), (23.905158818, -6.477647254), (19.780158818, -7.713912346))
        make_face()
        with Locations((23.905158818, -13.977647254)):
            Circle(SKETCH_45_R, mode=Mode.SUBTRACT)
    extrude(amount=-EXTRUDE_13_DEPTH)

    # 草图47 → 切除-拉伸29 (cut)
    with BuildSketch(Plane.XY.offset(-7.75)):
        with Locations((33.905158818, -13.977647254)):
            Circle(SKETCH_47_R)
        with Locations((13.905158818, -13.977647254)):
            Circle(SKETCH_47_R)
    extrude(amount=-CUT_EXTRUDE_29_DEPTH, mode=Mode.SUBTRACT)

    # 草图48 → 切除-拉伸30 (cut)
    with BuildSketch(Plane.XY.offset(13.75)):
        with Locations((-0.000580626, 2.75)):
            Rectangle(SKETCH_48_W, SKETCH_48_H)
    extrude(amount=-CUT_EXTRUDE_30_DEPTH, mode=Mode.SUBTRACT)

    # 草图49 → 切除-拉伸31 (cut)
    with BuildSketch(Plane.XY.offset(13.75)):
        with BuildLine():
            Line((16.905158818, -4.477647254), (30.905158818, -4.477647254))
            ThreePointArc((30.905158818, -4.477647254), (32.31937238, -5.063433692), (32.905158818, -6.477647254))
            Line((32.905158818, -6.477647254), (32.905158818, -11.477647254))
            Line((32.905158818, -11.477647254), (14.905158818, -11.477647254))
            Line((14.905158818, -11.477647254), (14.905158818, -6.477647254))
            ThreePointArc((14.905158818, -6.477647254), (15.490945255, -5.063433692), (16.905158818, -4.477647254))
        make_face()
    extrude(amount=-CUT_EXTRUDE_31_DEPTH, mode=Mode.SUBTRACT)

    # 草图50 → 凸台-拉伸14 (add)
    # profile 1 of 2: a face of its own
    with BuildSketch(Plane(origin=(50, 0, 0), x_dir=(0, 0, -1), z_dir=(1, 0, 0))):
        with Locations((19.25, -9.5)):
            Rectangle(SKETCH_50_W, SKETCH_50_H)
        with Locations(Location((20, -9.5, 0), (0, 0, 270))):
            Circle(SKETCH_50_R, mode=Mode.SUBTRACT)
    # profile 2 of 2: a face of its own
    with BuildSketch(Plane(origin=(50, 0, 0), x_dir=(0, 0, -1), z_dir=(1, 0, 0))):
        with Locations((-19.25, -9.5)):
            Rectangle(SKETCH_50_W, SKETCH_50_H)
        with Locations(Location((-20, -9.5, 0), (0, 0, 90))):
            Circle(SKETCH_50_R, mode=Mode.SUBTRACT)
    extrude(amount=EXTRUDE_14_DEPTH)

    # 圆角8
    fillet_8_edges = [part.edges().sort_by_distance(p)[0] for p in [
        (50, -9.5, -13.75),
        (50, -9.5, 13.75),
        (51, -22, -26.75),
        (51, 3, -26.75),
        (51, 3, 26.75),
        (51, -22, 26.75),
    ]]
    fillet(fillet_8_edges, radius=FILLET_8_R)

    # 圆角9
    fillet_9_edges = [part.edges().sort_by_distance(p)[0] for p in [
        (50, -22, 12.75),
        (50, -22, -12.75),
    ]]
    fillet(fillet_9_edges, radius=FILLET_9_R - 0.0001)  # a hair under: the kernel refuses the full size

    # 圆角10
    fillet_10_edges = [part.edges().sort_by_distance(p)[0] for p in [
        (52, -9.5, -11.75),
        (52, -9.5, 11.75),
    ]]
    fillet(fillet_10_edges, radius=FILLET_10_R - 0.0001)  # a hair under: the kernel refuses the full size


solid = part.part
